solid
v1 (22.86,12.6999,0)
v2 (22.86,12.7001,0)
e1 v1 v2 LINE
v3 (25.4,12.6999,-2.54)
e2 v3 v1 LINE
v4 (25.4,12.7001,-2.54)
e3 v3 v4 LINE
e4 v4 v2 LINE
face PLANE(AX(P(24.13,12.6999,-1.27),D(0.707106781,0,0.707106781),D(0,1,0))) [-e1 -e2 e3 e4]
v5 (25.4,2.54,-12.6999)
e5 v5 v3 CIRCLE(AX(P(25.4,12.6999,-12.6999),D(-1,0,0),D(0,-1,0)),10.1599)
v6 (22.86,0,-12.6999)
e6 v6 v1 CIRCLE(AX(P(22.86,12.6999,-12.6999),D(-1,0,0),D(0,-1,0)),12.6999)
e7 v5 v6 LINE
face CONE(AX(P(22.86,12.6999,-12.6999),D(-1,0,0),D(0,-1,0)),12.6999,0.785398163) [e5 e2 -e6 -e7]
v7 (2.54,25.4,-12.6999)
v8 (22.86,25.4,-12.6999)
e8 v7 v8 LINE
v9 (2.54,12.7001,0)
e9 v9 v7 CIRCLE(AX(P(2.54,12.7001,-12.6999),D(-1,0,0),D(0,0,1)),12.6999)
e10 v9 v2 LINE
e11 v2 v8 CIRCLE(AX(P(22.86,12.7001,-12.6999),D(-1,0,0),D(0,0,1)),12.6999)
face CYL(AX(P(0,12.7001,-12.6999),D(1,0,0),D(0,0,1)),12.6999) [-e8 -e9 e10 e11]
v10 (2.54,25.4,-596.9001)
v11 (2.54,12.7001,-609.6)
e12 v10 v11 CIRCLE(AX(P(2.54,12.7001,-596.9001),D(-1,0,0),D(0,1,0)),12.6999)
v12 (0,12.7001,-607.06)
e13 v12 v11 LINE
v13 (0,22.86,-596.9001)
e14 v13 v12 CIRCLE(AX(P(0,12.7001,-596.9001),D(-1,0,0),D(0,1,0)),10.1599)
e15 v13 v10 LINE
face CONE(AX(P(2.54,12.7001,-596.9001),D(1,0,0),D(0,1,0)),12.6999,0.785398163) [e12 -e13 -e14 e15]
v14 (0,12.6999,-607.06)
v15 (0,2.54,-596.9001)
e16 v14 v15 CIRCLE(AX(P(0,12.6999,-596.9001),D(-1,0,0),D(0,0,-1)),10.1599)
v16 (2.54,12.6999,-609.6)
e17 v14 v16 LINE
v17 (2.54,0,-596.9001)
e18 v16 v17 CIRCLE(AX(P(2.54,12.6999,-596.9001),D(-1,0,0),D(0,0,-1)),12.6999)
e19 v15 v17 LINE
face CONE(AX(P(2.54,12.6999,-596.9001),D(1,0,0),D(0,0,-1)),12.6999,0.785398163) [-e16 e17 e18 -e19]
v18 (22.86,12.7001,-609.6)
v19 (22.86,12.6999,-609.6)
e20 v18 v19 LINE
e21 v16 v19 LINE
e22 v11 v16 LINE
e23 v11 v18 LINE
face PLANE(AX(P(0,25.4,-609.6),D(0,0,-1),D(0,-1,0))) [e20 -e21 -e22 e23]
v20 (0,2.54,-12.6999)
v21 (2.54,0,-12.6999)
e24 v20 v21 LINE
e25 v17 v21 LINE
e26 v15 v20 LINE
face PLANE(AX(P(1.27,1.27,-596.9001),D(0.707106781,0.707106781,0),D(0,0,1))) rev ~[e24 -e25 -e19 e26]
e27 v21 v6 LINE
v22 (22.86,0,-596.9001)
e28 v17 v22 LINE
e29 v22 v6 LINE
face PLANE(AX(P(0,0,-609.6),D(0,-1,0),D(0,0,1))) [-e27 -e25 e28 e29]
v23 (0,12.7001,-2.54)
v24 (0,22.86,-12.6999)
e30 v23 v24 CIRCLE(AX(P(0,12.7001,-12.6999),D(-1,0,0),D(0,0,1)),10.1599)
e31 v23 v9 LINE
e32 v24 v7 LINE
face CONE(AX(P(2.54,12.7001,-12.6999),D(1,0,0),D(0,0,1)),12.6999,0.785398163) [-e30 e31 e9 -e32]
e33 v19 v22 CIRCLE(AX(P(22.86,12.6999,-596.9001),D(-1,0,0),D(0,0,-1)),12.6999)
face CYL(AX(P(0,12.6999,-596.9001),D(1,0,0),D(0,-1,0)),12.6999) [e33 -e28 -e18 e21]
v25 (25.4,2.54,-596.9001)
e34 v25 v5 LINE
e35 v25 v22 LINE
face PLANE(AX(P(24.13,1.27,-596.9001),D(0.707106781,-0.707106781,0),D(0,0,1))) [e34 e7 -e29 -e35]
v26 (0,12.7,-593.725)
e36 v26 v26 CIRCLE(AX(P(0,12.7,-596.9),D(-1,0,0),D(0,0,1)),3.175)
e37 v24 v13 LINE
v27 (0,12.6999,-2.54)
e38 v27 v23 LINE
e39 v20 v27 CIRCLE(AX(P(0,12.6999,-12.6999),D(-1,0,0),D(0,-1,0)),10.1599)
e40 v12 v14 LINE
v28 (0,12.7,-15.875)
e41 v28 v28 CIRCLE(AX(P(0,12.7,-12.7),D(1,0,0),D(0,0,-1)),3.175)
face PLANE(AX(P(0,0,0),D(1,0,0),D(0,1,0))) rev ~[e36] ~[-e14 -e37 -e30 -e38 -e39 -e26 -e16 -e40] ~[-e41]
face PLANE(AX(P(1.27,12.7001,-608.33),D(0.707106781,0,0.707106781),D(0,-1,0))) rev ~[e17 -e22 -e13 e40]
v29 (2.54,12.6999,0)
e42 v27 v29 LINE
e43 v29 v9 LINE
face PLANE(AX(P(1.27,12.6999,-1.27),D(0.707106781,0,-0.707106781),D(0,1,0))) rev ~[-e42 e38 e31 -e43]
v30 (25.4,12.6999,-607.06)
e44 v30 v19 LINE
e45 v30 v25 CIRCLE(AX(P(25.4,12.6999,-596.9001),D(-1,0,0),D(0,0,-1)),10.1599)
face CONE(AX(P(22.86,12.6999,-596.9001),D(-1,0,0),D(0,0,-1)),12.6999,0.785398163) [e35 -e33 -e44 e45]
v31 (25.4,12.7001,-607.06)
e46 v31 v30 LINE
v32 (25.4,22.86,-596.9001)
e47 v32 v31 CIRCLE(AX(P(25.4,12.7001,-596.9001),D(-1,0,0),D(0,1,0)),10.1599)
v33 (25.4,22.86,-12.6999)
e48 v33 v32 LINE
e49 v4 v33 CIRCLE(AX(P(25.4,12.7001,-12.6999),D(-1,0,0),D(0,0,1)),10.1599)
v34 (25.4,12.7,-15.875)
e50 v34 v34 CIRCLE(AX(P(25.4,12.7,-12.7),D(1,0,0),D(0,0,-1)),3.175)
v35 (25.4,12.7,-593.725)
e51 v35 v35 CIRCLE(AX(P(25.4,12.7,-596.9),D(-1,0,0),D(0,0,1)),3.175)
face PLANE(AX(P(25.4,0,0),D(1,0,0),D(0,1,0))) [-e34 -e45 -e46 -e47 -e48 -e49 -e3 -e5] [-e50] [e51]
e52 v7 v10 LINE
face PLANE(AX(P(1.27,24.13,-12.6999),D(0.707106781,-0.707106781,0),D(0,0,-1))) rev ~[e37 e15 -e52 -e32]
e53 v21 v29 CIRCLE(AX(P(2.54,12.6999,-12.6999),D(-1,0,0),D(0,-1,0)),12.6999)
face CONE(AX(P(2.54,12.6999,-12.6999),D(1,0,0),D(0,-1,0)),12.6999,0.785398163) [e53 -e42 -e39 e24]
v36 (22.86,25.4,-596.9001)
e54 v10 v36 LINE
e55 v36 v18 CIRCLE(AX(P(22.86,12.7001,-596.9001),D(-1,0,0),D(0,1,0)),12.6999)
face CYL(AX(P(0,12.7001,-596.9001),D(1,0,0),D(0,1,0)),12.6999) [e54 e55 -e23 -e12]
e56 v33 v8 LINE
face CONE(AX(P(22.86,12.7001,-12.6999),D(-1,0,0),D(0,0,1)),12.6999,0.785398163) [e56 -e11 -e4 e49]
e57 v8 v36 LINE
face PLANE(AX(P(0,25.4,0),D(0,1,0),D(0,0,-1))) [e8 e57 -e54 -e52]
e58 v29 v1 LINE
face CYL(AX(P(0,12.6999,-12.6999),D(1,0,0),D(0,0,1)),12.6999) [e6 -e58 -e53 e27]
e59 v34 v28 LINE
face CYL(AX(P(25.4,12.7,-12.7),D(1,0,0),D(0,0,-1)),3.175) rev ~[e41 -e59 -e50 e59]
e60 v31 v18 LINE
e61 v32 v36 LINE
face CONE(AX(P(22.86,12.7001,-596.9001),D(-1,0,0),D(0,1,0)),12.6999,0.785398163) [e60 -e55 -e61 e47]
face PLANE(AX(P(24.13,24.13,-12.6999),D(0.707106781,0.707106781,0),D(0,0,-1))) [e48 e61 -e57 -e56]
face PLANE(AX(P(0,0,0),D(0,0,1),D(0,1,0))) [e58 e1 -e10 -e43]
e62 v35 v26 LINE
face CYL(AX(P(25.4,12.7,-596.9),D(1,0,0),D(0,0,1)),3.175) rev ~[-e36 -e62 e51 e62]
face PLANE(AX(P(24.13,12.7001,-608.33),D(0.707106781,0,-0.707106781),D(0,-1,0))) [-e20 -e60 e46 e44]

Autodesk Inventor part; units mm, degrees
ref_plane "YZ Plane" through (0, 0, 0) normal (1, 0, 0) x (0, 1, 0)
ref_plane "XZ Plane" through (0, 0, 0) normal (0, 1, 0) x (-1, 0, 0)
sketch "Sketch1" plane through (0, 0, 0) normal (1, 0, 0) x (0, 1, 0)
  line L0 (0, 0) -> (25.4, 0)
  line L1 (25.4, 0) -> (25.4, -609.6)
  line L2 (25.4, -609.6) -> (0, -609.6)
  line L3 (0, -609.6) -> (0, 0)
  dimension "d0" = 25.4
  dimension "d1" = 609.6
extrude "Extrusion1" add sketch "Sketch1" along normal blind 25.4
sketch "Sketch3" plane through (25.4, 0, 0) normal (1, 0, 0) x (0, 0, -1)
  circle A0 centre (12.7, 12.7) radius 12.7
  line L0 (609.6, 25.4) -> (0, 25.4) projected
  line L1 (0, 25.4) -> (0, 0) projected
  circle A1 centre (12.7, 12.7) radius 3.175
  dimension "d12" = 25.4
  dimension "d13" = 6.35
extrude "Extrusion3" cut sketch "Sketch3" against normal blind 25.4 contours A1
ref_plane "Work Plane1" through (0, 0, -304.8) normal (0, 0, 1) x (1, 0, 0)
mirror "Mirror1" about plane through (0, 0, -304.8) normal (0, 0, 1) of "Extrusion3"
fillet "Fillet1" radius 12.7 4 edges at (12.7, 25.4, 0) (12.7, 0, 0) (12.7, 25.4, -609.6) (12.7, 0, -609.6)
chamfer "Chamfer1" distance 2.54 angle 45 8 edges at (25.4, 25.4, -304.8) (25.4, 21.6803, -3.7197) (25.4, 0, -304.8) (25.4, 21.6803, -605.8803) (0, 25.4, -304.8) (0, 21.6803, -605.8803) (0, 0, -304.8) (0, 21.6803, -3.7197)
properties part number "bar"
